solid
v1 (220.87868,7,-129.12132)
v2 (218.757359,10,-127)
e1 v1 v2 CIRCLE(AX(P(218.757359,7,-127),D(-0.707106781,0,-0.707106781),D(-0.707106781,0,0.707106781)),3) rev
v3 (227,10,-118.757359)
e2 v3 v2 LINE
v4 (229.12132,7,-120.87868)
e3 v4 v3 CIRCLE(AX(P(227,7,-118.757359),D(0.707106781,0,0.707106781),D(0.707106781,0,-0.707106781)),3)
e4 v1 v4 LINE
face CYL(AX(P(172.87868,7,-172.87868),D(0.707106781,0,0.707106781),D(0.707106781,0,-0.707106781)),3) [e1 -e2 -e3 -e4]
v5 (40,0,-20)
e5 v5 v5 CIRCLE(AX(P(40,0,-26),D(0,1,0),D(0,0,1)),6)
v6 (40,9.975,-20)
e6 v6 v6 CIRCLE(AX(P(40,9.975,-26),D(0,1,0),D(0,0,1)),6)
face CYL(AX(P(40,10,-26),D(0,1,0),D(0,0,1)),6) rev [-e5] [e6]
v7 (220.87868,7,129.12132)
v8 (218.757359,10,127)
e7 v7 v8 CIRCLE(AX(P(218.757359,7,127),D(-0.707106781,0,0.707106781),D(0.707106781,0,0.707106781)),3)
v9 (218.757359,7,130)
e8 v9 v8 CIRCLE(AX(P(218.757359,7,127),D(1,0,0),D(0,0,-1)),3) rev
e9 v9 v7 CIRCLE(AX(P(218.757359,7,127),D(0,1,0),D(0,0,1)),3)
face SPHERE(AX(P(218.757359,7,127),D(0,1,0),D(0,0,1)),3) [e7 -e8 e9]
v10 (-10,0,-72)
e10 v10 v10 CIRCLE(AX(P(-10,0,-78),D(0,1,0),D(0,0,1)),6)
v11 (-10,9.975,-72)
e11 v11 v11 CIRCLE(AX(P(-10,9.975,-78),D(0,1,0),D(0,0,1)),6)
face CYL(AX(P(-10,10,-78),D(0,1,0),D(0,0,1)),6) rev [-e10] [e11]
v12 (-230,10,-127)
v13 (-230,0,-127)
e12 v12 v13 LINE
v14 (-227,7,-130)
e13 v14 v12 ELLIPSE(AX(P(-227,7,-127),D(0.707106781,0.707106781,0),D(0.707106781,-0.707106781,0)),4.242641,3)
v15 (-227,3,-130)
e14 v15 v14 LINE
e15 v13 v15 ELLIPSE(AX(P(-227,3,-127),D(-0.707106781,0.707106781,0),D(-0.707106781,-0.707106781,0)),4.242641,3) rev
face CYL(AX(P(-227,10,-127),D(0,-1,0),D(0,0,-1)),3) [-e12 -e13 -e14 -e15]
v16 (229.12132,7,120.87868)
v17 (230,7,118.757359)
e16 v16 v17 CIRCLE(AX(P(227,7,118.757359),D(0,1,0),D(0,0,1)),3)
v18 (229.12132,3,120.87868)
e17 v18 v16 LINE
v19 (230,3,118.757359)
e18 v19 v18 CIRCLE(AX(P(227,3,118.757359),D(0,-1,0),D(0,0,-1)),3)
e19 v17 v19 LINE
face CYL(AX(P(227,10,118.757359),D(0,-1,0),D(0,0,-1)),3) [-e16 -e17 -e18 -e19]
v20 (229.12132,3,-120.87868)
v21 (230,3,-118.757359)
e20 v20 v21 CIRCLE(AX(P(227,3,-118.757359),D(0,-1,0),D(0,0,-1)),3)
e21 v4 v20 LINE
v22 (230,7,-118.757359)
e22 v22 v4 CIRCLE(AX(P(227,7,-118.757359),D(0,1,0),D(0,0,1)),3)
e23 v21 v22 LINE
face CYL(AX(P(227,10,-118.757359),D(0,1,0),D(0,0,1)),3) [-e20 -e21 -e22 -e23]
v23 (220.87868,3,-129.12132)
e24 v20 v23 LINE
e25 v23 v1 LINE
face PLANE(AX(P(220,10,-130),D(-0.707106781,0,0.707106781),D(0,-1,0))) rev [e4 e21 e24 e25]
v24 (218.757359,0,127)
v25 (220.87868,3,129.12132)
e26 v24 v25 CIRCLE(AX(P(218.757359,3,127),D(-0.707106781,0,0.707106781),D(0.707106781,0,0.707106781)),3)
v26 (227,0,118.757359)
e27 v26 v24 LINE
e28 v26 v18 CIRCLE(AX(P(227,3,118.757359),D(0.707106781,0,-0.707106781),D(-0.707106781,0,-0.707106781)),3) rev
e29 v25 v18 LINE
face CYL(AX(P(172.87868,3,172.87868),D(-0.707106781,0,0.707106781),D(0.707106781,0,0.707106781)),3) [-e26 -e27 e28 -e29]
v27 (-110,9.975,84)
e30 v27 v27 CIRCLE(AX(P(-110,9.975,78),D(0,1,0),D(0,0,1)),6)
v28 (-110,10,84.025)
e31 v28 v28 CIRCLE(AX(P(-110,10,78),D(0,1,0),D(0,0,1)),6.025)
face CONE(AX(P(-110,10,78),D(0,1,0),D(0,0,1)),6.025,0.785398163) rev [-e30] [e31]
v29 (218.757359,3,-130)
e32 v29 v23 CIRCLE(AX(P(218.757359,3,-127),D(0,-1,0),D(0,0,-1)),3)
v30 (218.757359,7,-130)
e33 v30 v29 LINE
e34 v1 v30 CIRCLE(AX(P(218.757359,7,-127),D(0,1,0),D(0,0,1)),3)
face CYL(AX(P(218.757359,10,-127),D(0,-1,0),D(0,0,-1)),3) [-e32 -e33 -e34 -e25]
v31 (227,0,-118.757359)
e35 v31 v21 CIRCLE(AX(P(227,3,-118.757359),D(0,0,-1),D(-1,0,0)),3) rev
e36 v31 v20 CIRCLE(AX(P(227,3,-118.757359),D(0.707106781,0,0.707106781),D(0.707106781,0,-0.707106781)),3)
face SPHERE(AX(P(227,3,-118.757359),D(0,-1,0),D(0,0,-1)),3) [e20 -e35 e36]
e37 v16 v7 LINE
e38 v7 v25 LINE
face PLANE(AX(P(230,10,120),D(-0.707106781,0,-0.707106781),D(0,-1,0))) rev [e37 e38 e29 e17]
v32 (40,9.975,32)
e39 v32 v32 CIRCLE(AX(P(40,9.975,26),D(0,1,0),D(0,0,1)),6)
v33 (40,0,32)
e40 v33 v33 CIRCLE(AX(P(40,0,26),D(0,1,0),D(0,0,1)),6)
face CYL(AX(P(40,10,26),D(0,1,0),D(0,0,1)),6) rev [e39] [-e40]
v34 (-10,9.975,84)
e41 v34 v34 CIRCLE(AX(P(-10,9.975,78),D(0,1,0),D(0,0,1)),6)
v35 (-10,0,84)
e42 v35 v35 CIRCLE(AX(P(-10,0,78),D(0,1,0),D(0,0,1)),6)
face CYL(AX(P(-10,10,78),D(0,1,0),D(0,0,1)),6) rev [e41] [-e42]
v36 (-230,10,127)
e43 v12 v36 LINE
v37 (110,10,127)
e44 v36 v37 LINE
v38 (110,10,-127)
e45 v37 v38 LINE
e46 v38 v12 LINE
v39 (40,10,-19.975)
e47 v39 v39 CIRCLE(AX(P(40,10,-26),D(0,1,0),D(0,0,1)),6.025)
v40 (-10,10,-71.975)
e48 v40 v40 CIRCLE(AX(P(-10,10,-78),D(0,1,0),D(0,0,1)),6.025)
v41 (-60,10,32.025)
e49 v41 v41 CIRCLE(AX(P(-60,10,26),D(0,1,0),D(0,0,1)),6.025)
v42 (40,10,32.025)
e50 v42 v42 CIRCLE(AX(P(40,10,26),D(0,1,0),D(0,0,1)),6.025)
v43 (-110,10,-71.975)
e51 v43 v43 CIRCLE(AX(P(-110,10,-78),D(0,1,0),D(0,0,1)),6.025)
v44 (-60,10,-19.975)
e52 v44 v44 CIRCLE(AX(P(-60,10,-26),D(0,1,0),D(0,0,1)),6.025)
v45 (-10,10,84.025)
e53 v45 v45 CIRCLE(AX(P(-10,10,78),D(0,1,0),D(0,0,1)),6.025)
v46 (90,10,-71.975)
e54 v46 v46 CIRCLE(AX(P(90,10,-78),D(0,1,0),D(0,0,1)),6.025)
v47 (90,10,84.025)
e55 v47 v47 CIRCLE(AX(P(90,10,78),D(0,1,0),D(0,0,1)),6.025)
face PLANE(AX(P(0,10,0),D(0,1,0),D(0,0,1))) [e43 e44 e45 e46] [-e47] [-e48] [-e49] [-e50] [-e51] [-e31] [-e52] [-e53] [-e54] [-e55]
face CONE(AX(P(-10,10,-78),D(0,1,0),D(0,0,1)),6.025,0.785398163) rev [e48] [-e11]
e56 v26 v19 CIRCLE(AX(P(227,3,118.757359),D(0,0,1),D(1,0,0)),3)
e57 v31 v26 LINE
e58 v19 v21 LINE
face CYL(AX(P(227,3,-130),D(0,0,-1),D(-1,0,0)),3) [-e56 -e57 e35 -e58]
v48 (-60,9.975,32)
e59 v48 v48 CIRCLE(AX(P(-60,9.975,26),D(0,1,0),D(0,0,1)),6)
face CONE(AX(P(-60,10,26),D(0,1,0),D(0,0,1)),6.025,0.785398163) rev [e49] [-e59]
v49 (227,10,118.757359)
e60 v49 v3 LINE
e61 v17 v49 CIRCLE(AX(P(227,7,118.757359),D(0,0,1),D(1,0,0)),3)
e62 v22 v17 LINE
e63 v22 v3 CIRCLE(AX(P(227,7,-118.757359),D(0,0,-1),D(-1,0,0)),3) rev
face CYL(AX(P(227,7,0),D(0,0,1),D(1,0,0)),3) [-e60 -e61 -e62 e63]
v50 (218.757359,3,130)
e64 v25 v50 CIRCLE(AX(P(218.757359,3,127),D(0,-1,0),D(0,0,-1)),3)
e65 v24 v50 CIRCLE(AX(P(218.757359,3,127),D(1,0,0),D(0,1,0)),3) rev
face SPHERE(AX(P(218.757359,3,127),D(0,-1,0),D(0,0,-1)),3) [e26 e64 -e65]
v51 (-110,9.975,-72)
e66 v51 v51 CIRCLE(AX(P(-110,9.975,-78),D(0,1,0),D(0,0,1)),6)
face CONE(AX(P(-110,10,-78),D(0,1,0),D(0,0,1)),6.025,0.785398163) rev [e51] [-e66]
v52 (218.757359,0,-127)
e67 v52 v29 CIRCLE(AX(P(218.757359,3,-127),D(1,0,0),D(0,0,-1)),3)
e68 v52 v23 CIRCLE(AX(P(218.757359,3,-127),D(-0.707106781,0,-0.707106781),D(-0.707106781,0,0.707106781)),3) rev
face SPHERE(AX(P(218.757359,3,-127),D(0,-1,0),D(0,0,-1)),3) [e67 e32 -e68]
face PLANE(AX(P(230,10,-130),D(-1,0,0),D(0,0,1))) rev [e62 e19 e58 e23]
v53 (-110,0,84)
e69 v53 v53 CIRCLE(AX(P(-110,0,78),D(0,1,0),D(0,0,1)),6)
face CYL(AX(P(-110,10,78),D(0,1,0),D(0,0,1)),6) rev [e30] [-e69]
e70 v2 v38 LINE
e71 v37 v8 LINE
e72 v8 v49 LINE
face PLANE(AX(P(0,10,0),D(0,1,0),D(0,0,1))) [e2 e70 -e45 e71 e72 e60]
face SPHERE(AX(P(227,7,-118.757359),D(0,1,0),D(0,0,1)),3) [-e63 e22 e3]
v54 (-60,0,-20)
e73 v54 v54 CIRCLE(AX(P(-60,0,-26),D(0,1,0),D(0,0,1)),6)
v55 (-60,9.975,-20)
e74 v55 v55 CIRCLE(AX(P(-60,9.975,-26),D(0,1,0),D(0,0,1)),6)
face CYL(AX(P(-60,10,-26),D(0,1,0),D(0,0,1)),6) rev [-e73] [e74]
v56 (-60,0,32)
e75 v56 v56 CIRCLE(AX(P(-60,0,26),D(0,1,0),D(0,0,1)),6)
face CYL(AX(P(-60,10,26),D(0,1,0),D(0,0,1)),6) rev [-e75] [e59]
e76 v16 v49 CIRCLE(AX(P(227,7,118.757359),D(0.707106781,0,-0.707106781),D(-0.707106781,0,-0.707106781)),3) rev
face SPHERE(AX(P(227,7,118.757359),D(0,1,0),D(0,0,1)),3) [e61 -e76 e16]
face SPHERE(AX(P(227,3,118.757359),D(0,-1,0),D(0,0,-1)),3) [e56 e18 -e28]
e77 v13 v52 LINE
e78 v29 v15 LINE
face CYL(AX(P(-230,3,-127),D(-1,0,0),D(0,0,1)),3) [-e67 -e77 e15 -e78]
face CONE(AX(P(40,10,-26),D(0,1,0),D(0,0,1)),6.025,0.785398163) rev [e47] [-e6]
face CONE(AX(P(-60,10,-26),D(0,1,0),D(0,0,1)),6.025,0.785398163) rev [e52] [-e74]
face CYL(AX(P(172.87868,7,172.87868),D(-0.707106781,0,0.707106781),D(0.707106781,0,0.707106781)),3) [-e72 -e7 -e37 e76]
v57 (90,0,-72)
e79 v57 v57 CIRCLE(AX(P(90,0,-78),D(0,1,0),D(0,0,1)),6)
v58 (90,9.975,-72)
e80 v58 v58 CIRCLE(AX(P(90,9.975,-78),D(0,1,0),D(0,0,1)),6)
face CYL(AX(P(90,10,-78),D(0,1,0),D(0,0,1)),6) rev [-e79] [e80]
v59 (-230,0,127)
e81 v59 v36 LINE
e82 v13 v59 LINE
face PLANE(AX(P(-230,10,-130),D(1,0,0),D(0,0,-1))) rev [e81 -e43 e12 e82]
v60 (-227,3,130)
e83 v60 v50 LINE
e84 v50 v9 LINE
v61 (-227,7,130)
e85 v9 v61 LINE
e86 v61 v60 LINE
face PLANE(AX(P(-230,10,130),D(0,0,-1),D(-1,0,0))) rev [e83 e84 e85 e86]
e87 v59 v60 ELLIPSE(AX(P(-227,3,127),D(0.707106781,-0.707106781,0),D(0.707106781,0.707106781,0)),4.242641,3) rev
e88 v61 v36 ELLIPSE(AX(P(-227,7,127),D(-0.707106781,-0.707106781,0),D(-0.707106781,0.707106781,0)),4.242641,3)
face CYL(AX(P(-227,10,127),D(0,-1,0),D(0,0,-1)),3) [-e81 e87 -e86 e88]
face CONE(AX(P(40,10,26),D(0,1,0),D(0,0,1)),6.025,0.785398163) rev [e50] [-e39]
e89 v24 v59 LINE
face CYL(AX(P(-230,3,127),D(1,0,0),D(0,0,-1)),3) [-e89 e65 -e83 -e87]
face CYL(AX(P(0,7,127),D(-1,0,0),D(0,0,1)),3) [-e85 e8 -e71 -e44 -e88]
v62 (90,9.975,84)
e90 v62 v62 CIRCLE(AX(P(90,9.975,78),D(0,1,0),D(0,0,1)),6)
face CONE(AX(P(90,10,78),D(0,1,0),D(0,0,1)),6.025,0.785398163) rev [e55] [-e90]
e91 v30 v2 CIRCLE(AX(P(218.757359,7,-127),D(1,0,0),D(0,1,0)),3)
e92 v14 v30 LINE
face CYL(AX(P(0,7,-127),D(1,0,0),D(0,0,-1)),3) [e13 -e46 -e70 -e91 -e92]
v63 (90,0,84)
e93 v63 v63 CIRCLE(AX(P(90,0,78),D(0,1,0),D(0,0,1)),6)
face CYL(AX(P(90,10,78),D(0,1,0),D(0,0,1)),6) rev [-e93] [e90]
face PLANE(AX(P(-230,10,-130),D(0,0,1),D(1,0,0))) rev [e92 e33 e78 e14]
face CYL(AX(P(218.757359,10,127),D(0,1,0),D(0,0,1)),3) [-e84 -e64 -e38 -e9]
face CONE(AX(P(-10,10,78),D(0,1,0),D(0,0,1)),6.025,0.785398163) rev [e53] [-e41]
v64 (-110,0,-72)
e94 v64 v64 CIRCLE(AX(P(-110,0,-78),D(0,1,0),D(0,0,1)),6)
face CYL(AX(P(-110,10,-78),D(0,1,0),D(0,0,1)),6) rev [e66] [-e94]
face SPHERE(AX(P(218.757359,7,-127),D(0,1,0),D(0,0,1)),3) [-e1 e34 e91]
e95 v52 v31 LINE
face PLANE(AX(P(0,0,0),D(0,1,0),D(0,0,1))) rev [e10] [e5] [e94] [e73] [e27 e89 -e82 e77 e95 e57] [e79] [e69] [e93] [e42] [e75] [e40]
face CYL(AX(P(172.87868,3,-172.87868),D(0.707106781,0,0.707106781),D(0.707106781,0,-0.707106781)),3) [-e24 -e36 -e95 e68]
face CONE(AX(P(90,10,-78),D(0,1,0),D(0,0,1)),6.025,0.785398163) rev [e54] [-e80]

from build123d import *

# Parameters (mm, degrees)
SKETCH1_W                       = 460
SKETCH1_H                       = 260
BASE_FLANGE1_DEPTH              = 10
BREAK_CORNER1_DEPTH             = 10
M10_CLEARANCE_HOLE1_D           = 12
M10_CLEARANCE_HOLE1_CSINK_D     = 12.05
M10_CLEARANCE_HOLE1_CSINK_ANGLE = 90
FILLET1_R                       = 3


# Read off the part's stored shape, not the designer's step: Break-Corner1
# Sheet-metal steps are written as plain solids
with BuildPart() as part:
    # Sketch1 → Base-Flange1 (new body)
    with BuildSketch(Plane(origin=(0, 0, 0), x_dir=(1, 0, 0), z_dir=(0, 1, 0))):
        Rectangle(SKETCH1_W, SKETCH1_H)
    extrude(amount=BASE_FLANGE1_DEPTH)

    # Break-Corner1 outline → Break-Corner1 (cut)
    with BuildSketch(Plane(origin=(0, 0, 0), x_dir=(1, 0, 0), z_dir=(0, 1, 0))):
        Polygon((230, -130), (230, -120), (220, -130), align=None)
        Polygon((220, 130), (230, 120), (230, 130), align=None)
    extrude(amount=BREAK_CORNER1_DEPTH, mode=Mode.SUBTRACT)

    # M10 Clearance Hole1 (through all)
    with Locations(Plane(origin=(0, 10, 0), x_dir=(1, 0, 0), z_dir=(0, 1, 0))):
        with Locations((-110, 78), (-10, 78), (90, 78), (-60, 26), (40, 26), (-60, -26), (40, -26), (-110, -78), (-10, -78), (90, -78)):
            CounterSinkHole(M10_CLEARANCE_HOLE1_D / 2, M10_CLEARANCE_HOLE1_CSINK_D / 2, counter_sink_angle=M10_CLEARANCE_HOLE1_CSINK_ANGLE)

    # Fillet1
    fillet1_edges = [part.edges().sort_by_distance(p)[0] for p in [
        (230, 0, 0),
        (230, 10, 0),
        (230, 5, 120),
        (225, 0, 125),
        (220, 5, 130),
        (225, 10, 125),
        (-5, 0, -130),
        (-5, 10, -130),
        (220, 5, -130),
        (225, 0, -125),
        (230, 5, -120),
        (225, 10, -125),
        (-5, 0, 130),
        (-230, 5, -130),
        (-230, 5, 130),
        (-5, 10, 130),
    ]]
    fillet(fillet1_edges, radius=FILLET1_R)


solid = part.part
